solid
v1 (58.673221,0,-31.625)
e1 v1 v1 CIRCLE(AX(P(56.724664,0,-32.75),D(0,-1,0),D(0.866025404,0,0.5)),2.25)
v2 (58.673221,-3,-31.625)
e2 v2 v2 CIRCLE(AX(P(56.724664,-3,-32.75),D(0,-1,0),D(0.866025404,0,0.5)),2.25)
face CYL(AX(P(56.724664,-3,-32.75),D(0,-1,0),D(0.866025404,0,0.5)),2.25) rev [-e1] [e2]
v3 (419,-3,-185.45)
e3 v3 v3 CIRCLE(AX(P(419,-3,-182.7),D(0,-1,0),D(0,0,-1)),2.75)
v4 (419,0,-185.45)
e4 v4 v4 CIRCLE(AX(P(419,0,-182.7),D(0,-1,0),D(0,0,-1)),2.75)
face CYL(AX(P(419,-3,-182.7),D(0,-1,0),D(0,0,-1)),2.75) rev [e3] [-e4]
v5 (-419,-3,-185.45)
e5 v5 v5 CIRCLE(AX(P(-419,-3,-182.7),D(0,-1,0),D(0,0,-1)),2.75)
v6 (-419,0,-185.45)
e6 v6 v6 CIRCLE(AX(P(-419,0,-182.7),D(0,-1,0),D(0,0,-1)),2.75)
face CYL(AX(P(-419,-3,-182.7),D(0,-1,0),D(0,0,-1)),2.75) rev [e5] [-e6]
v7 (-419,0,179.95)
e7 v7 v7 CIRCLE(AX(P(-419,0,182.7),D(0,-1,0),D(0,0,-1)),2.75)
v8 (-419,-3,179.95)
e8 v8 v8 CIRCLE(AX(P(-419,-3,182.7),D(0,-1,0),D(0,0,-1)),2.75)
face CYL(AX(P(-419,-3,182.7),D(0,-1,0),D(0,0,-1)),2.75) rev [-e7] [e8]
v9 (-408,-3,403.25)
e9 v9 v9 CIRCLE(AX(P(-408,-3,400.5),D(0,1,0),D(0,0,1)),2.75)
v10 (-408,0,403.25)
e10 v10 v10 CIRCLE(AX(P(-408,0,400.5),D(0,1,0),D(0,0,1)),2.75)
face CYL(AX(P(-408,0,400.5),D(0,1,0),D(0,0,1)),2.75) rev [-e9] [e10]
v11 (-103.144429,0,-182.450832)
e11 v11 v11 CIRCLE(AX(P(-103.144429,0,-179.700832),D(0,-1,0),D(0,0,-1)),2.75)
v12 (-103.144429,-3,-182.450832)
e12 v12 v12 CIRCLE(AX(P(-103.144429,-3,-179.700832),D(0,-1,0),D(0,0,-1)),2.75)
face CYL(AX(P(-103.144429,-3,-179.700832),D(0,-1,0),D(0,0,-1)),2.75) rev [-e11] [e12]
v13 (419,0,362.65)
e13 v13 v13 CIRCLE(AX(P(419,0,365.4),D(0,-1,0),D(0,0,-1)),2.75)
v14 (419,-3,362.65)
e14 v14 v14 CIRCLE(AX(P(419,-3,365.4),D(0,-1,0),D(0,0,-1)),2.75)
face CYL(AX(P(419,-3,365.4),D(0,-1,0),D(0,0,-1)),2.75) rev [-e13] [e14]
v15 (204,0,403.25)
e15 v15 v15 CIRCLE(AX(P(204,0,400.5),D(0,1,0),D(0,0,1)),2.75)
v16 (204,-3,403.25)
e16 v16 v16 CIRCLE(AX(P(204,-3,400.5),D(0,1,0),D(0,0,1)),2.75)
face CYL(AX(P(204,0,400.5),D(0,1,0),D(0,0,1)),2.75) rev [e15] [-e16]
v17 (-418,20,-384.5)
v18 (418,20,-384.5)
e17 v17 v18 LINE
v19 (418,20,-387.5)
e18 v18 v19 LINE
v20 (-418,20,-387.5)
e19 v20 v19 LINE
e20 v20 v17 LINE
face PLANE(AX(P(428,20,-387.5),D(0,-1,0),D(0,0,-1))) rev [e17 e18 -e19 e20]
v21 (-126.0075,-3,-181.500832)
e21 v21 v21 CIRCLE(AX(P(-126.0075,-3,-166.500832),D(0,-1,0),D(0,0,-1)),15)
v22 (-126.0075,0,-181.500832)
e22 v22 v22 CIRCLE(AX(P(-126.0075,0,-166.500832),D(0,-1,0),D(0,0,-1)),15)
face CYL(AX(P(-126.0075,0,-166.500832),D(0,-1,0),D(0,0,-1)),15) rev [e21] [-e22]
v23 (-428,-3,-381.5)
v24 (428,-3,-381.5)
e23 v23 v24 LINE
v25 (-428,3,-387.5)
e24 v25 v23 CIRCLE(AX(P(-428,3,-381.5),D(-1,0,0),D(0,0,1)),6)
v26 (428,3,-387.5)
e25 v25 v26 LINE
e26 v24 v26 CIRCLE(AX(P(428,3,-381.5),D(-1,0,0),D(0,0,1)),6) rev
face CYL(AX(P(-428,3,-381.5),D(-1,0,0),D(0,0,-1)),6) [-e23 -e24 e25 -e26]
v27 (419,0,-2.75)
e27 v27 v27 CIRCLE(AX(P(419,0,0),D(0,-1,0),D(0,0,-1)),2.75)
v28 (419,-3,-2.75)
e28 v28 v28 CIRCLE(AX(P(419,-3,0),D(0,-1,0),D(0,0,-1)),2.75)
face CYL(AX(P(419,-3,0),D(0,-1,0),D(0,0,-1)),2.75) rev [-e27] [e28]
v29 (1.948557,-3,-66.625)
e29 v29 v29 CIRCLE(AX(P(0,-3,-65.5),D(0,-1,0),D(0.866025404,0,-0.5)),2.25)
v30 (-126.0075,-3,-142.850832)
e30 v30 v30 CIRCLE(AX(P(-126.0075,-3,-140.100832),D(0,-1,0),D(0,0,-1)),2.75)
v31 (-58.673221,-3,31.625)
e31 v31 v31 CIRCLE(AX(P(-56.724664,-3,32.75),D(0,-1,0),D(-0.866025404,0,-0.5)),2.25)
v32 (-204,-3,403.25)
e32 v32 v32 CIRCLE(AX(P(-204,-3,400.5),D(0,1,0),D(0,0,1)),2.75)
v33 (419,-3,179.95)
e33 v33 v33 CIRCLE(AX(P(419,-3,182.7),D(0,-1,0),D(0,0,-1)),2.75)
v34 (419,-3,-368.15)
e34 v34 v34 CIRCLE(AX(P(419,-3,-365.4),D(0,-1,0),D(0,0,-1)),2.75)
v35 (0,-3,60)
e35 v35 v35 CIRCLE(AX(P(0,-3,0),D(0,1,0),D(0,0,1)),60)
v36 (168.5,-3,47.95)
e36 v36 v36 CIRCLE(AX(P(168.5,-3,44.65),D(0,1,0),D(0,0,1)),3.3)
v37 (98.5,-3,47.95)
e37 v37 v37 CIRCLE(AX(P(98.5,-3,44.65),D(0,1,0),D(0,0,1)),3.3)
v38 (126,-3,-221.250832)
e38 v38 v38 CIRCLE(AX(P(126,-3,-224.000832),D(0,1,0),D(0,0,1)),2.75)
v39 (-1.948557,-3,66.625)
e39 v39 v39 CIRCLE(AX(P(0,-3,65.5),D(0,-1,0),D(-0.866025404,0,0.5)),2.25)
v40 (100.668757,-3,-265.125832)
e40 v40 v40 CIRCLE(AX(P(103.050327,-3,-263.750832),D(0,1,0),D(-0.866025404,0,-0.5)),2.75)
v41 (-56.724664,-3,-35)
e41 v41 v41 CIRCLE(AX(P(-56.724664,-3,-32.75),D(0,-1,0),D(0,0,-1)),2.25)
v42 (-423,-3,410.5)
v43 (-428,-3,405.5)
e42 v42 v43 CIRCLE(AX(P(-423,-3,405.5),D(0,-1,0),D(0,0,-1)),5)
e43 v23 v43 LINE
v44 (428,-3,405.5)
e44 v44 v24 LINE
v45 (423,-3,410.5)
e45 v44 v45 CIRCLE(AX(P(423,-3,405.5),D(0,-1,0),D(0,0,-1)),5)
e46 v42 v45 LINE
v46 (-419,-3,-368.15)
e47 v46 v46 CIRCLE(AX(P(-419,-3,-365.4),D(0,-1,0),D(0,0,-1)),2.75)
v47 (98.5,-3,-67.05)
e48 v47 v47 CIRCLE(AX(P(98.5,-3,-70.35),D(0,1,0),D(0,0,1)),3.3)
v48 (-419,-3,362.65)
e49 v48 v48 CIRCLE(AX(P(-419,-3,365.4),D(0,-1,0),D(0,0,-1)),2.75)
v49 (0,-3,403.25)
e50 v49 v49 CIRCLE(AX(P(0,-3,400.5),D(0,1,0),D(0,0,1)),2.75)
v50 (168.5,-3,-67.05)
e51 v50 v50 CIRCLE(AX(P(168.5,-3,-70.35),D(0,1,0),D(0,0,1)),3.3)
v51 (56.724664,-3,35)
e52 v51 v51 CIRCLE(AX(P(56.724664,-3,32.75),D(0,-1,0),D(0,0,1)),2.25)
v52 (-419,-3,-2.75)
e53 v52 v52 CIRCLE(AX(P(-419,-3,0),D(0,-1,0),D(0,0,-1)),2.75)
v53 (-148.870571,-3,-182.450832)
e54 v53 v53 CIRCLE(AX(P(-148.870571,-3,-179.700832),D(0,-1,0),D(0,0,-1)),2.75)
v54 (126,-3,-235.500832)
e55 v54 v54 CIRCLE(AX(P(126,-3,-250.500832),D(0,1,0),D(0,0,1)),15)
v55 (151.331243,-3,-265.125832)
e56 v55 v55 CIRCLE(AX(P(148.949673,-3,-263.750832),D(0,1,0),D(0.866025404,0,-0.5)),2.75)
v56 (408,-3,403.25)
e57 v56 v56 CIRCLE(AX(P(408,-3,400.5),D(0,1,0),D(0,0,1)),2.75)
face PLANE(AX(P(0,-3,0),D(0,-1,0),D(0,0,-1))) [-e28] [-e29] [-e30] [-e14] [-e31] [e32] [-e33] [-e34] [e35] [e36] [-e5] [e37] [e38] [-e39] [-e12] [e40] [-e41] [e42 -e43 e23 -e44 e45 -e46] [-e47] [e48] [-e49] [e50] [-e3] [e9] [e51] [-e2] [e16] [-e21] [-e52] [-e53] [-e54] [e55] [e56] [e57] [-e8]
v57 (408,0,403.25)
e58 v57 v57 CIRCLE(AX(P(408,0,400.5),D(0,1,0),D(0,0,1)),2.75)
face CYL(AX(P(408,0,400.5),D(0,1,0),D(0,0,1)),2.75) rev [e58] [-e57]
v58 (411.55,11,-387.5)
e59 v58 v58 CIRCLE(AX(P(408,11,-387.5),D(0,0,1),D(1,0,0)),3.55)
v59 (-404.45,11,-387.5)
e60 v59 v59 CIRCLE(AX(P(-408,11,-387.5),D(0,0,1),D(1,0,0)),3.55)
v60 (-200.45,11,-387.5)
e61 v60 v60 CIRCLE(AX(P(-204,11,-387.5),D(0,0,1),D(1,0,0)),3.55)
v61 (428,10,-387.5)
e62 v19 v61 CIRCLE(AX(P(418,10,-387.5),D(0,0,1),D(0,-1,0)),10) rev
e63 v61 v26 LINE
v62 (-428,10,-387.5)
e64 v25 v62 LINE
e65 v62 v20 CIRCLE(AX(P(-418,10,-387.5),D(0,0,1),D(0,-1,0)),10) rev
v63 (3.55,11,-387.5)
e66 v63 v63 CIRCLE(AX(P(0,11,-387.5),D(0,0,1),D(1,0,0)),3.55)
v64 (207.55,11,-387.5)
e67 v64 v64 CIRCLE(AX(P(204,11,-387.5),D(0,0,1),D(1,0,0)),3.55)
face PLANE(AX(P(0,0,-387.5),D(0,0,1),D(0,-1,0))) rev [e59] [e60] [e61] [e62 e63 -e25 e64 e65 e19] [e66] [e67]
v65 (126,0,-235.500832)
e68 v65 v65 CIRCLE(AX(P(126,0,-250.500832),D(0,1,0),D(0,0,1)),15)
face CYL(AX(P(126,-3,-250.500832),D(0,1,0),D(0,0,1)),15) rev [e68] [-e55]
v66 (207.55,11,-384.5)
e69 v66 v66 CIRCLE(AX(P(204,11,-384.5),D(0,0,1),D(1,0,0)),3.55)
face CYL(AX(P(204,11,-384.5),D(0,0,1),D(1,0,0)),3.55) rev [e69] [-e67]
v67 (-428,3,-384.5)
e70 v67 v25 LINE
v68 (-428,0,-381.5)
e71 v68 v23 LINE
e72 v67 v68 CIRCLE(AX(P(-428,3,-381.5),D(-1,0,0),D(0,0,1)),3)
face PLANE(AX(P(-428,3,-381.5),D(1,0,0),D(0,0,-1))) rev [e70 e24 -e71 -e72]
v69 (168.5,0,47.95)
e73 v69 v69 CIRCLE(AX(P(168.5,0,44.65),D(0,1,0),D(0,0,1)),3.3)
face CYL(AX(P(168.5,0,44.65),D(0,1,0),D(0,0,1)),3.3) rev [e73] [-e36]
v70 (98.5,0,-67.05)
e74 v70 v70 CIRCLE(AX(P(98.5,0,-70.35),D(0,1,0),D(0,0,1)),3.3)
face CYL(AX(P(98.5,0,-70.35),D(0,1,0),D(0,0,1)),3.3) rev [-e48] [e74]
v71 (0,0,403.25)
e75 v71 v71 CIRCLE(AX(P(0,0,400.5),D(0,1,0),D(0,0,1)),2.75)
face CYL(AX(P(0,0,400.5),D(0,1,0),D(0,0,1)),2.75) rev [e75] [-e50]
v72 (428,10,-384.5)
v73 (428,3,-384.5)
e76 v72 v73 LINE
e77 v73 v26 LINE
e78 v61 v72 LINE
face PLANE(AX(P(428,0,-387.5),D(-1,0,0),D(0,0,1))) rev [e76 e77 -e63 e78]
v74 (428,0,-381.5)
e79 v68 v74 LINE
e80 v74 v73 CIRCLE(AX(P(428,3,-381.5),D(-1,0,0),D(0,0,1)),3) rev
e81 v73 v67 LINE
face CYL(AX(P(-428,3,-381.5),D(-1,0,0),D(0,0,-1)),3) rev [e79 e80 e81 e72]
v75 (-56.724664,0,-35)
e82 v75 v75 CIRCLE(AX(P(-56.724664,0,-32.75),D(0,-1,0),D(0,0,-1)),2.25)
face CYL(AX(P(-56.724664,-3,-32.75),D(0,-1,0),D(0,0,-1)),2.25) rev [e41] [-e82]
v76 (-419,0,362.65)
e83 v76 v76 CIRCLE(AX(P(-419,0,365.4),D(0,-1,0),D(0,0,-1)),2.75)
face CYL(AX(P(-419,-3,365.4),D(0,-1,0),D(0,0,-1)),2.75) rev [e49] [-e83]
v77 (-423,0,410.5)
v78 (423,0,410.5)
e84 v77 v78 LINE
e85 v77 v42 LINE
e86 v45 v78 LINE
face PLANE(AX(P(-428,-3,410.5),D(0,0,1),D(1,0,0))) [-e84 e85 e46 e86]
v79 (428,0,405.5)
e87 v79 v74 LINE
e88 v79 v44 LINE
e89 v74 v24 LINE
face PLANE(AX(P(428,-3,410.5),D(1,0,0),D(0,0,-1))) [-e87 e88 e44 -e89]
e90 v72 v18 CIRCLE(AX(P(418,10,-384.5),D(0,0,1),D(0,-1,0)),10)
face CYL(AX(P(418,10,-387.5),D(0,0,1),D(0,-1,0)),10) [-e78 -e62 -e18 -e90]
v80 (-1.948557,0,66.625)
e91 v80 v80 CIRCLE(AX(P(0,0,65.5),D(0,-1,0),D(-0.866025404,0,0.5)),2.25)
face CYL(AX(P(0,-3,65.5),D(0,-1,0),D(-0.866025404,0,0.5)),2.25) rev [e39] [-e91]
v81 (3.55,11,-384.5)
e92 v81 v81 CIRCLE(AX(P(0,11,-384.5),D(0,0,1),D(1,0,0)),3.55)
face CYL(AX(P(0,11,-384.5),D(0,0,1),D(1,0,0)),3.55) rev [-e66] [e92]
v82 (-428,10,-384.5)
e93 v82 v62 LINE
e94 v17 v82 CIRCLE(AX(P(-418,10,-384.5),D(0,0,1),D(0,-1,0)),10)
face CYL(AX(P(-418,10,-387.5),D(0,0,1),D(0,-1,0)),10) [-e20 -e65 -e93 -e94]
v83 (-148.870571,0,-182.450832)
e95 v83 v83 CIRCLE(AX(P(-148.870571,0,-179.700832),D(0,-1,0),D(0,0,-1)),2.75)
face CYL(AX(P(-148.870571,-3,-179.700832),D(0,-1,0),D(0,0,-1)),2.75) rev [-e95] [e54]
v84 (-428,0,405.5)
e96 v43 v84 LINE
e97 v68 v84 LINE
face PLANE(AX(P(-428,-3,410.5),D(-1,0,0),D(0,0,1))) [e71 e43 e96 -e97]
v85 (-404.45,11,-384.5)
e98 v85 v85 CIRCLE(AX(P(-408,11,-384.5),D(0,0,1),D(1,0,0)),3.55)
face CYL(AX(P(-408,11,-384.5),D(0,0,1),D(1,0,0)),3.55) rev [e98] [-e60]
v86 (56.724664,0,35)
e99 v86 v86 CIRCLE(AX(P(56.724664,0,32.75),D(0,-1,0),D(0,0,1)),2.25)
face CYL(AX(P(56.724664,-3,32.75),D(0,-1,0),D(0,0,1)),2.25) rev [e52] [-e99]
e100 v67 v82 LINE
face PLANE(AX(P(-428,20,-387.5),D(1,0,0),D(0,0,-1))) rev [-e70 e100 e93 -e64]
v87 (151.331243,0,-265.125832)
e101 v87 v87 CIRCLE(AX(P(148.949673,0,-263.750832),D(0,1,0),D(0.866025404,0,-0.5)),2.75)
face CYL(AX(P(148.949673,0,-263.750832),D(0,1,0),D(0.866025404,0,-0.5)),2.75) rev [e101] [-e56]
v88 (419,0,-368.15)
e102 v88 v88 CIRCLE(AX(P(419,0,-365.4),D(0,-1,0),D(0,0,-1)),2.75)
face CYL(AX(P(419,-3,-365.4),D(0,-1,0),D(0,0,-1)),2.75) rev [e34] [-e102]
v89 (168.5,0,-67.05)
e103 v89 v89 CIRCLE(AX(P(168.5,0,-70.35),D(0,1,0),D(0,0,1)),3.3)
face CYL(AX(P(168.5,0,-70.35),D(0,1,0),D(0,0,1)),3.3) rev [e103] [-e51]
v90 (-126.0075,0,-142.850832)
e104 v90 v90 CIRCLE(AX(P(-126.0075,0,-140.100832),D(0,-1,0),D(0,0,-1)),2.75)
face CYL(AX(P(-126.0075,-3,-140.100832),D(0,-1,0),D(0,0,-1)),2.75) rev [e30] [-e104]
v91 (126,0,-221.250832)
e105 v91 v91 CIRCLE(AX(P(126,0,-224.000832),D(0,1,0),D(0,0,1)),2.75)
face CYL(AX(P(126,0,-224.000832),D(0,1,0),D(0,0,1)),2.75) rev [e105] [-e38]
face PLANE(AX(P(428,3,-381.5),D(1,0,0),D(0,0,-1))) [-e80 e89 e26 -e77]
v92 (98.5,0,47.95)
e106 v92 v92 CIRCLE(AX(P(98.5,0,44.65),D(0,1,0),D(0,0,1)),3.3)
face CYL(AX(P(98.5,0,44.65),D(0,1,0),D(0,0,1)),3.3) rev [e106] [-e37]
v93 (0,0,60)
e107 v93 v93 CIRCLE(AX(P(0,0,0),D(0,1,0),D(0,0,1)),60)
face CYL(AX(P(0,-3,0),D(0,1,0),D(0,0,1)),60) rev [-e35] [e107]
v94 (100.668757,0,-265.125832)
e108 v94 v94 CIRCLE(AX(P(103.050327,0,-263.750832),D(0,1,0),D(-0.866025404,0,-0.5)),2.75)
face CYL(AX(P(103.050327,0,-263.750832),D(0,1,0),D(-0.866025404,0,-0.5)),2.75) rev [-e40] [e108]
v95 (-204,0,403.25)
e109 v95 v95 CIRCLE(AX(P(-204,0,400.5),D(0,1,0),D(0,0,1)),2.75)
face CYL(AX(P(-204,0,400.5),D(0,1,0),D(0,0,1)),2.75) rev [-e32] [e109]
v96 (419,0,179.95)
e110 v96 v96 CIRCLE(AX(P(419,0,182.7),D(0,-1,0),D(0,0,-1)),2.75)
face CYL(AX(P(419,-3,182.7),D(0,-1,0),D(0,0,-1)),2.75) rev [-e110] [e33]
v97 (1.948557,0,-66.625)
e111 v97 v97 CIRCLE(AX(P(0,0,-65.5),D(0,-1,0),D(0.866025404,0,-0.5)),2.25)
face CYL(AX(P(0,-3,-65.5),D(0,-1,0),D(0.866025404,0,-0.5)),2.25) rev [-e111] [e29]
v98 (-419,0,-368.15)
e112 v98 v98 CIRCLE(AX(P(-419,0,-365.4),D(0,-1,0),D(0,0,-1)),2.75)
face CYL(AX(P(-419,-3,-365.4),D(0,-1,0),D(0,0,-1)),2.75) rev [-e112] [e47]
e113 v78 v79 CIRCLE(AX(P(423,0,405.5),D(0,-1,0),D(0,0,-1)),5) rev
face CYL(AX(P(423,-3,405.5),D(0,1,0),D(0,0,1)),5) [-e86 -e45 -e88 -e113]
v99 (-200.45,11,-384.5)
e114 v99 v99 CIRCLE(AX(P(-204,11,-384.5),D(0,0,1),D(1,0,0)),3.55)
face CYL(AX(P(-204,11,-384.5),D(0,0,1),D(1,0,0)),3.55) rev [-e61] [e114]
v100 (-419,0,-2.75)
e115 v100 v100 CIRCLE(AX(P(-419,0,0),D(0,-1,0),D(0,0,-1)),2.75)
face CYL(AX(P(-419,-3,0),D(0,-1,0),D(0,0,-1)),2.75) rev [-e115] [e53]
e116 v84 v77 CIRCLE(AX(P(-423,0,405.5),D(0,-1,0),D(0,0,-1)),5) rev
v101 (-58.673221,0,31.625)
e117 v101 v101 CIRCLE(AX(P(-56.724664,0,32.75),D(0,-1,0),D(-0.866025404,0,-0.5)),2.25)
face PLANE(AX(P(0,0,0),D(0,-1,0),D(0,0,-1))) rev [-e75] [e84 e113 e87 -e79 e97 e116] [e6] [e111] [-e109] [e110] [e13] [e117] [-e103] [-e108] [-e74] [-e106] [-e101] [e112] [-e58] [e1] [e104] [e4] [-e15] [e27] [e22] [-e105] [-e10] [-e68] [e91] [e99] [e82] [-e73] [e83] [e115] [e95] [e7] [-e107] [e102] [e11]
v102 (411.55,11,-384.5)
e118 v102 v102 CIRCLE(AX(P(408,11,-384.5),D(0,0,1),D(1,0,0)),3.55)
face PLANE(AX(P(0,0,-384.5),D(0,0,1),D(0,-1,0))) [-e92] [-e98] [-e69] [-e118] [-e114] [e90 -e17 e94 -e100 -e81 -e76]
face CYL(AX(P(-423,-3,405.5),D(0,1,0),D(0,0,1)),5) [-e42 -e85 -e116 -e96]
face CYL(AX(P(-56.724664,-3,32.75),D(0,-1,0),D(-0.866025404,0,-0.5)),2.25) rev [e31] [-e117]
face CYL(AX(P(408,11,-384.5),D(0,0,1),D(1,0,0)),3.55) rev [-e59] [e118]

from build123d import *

# Parameters (mm, degrees)
SKETCH1_W                    = 856
SKETCH1_H                    = 798
BASE_FLANGE1_DEPTH           = 3
SKETCH8_R                    = 60
CUT_EXTRUDE1_DEPTH           = 3
M4_CLEARANCE_HOLE1_D         = 4.5
CIRPATTERN1_COUNT            = 6
EDGE_FLANGE1_STRIP_W         = 18
EDGE_FLANGE1_STRIP_H         = 3
EDGE_FLANGE1_STRIP_CUT_DEPTH = 856
EDGE_FLANGE1_DEPTH           = 856
M5_CLEARANCE_HOLE3_D         = 5.5
M5_CLEARANCE_HOLE4_D         = 5.5
LPATTERN1_COUNT              = 5
LPATTERN1_PITCH              = 204
F_7_1_7_1_DIAMETER_HOLE1_D   = 7.1
LPATTERN2_COUNT              = 5
LPATTERN2_PITCH              = 204
SKETCH26_R                   = 15
CUT_EXTRUDE2_DEPTH           = 3
M5_CLEARANCE_HOLE6_D         = 5.5
FILLET1_R                    = 5
FILLET2_R                    = 10
SKETCH29_R                   = 15
CUT_EXTRUDE3_DEPTH           = 10
M5_CLEARANCE_HOLE7_D         = 5.5
CIRPATTERN2_COUNT            = 3
M6_CLEARANCE_HOLE1_D         = 6.6


# Sheet-metal steps are written as plain solids
with BuildPart() as part:
    # Sketch1 → Base-Flange1 (new body)
    with BuildSketch(Plane(origin=(0, 0, 0), x_dir=(1, 0, 0), z_dir=(0, 1, 0))):
        with Locations((0, -11.5)):
            Rectangle(SKETCH1_W, SKETCH1_H)
    extrude(amount=-BASE_FLANGE1_DEPTH)

    # Sketch8 → Cut-Extrude1 (cut)
    with BuildSketch(Plane(origin=(0, 0, 0), x_dir=(1, 0, 0), z_dir=(0, 1, 0))):
        with Locations(Location((0, 0, 0), (0, 0, 270))):
            Circle(SKETCH8_R)
    extrude(amount=-CUT_EXTRUDE1_DEPTH, mode=Mode.SUBTRACT)

    # M4 Clearance Hole1 (through all)
    with Locations(Plane(origin=(0, -3, 0), x_dir=(-1, 0, 0), z_dir=(0, -1, 0))):
        with Locations((56.724663948, 32.75)):
            m4_clearance_hole1 = Hole(M4_CLEARANCE_HOLE1_D / 2)

    # CirPattern1: M4 Clearance Hole1 ×6 about axis
    cirpattern1_axis = Axis((0, 0, 0), (0, 1, 0))
    for i in range(1, CIRPATTERN1_COUNT):
        add(m4_clearance_hole1.rotate(cirpattern1_axis, i * 360 / CIRPATTERN1_COUNT), mode=Mode.SUBTRACT)

    # Edge-Flange1 strip (across the edge) → Edge-Flange1 strip cut (cut)
    with BuildSketch(Plane(origin=(428, 0, -387.5), x_dir=(0, 0, 1), z_dir=(-1, 0, 0))):
        with Locations((-3, -1.5)):
            Rectangle(EDGE_FLANGE1_STRIP_W, EDGE_FLANGE1_STRIP_H)
    extrude(amount=EDGE_FLANGE1_STRIP_CUT_DEPTH, mode=Mode.SUBTRACT)

    # Edge-Flange1 section (across the edge) → Edge-Flange1 (add)
    with BuildSketch(Plane(origin=(428, 0, -387.5), x_dir=(0, 0, 1), z_dir=(-1, 0, 0))):
        with BuildLine():
            Line((0, 3), (0, 20))
            Line((0, 20), (3, 20))
            Line((3, 20), (3, 3))
            ThreePointArc((3, 3), (3.878679656, 0.878679656), (6, 0))
            Line((6, 0), (6, -3))
            ThreePointArc((6, -3), (1.757359313, -1.242640687), (0, 3))
        make_face()
    extrude(amount=EDGE_FLANGE1_DEPTH)

    # M5 Clearance Hole3 (through all)
    with Locations(Plane(origin=(0, -3, 0), x_dir=(-1, 0, 0), z_dir=(0, -1, 0))):
        with Locations((419, 365.4), (419, 182.7), (419, 0), (419, -182.7), (419, -365.4)):
            m5_clearance_hole3 = Hole(M5_CLEARANCE_HOLE3_D / 2)

    # Mirror2: M5 Clearance Hole3 across plane
    add(m5_clearance_hole3.mirror(Plane(origin=(0, 0, 0), x_dir=(0, 0, 1), z_dir=(1, 0, 0))), mode=Mode.SUBTRACT)

    # M5 Clearance Hole4 (through all)
    with Locations(Plane(origin=(0, 0, 0), x_dir=(1, 0, 0), z_dir=(0, 1, 0))):
        with Locations((-408, -400.5)):
            m5_clearance_hole4 = Hole(M5_CLEARANCE_HOLE4_D / 2)

    # LPattern1: M5 Clearance Hole4 ×5
    with Locations(*[(i * LPATTERN1_PITCH, 0, 0) for i in range(1, LPATTERN1_COUNT)]):
        add(m5_clearance_hole4, mode=Mode.SUBTRACT)

    # Ø7.1 (7.1) Diameter Hole1 (through all)
    with Locations(Plane.XY.offset(-384.5)):
        with Locations((-408, 11)):
            f_7_1_7_1_diameter_hole1 = Hole(F_7_1_7_1_DIAMETER_HOLE1_D / 2)

    # LPattern2: Ø7.1 (7.1) Diameter Hole1 ×5
    with Locations(*[(i * LPATTERN2_PITCH, 0, 0) for i in range(1, LPATTERN2_COUNT)]):
        add(f_7_1_7_1_diameter_hole1, mode=Mode.SUBTRACT)

    # Sketch26 → Cut-Extrude2 (cut)
    with BuildSketch(Plane(origin=(0, -3, 0), x_dir=(-1, 0, 0), z_dir=(0, -1, 0))):
        with Locations(Location((126.0075, 166.500832071, 0), (0, 0, 90))):
            Circle(SKETCH26_R)
    extrude(amount=-CUT_EXTRUDE2_DEPTH, mode=Mode.SUBTRACT)

    # M5 Clearance Hole6 (through all)
    with Locations(Plane(origin=(0, -3, 0), x_dir=(-1, 0, 0), z_dir=(0, -1, 0))):
        with Locations((148.87057066, 179.700832071), (126.0075, 140.100832071), (103.14442934, 179.700832071)):
            Hole(M5_CLEARANCE_HOLE6_D / 2)

    # Fillet1
    fillet1_edges = [part.edges().sort_by_distance(p)[0] for p in [
        (428, -1.5, 410.5),
        (-428, -1.5, 410.5),
    ]]
    fillet(fillet1_edges, radius=FILLET1_R)

    # Fillet2
    fillet2_edges = [part.edges().sort_by_distance(p)[0] for p in [
        (428, 20, -386),
        (-428, 20, -386),
    ]]
    fillet(fillet2_edges, radius=FILLET2_R)

    # Sketch29 → Cut-Extrude3 (cut)
    with BuildSketch(Plane(origin=(0, 0, 0), x_dir=(1, 0, 0), z_dir=(0, 1, 0))):
        with Locations(Location((126, 250.500832071, 0), (0, 0, 270))):
            Circle(SKETCH29_R)
    extrude(amount=-CUT_EXTRUDE3_DEPTH, mode=Mode.SUBTRACT)

    # M5 Clearance Hole7 (through all)
    with Locations(Plane(origin=(0, 0, 0), x_dir=(1, 0, 0), z_dir=(0, 1, 0))):
        with Locations((126, 224.000832071)):
            m5_clearance_hole7 = Hole(M5_CLEARANCE_HOLE7_D / 2)

    # CirPattern2: M5 Clearance Hole7 ×3 about axis
    cirpattern2_axis = Axis((126, 0, -250.500832071), (0, 1, 0))
    for i in range(1, CIRPATTERN2_COUNT):
        add(m5_clearance_hole7.rotate(cirpattern2_axis, i * 360 / CIRPATTERN2_COUNT), mode=Mode.SUBTRACT)

    # M6 Clearance Hole1 (through all)
    with Locations(Plane(origin=(0, 0, 0), x_dir=(1, 0, 0), z_dir=(0, 1, 0))):
        with Locations((98.5, -44.65), (168.5, -44.65), (168.5, 70.35), (98.5, 70.35)):
            Hole(M6_CLEARANCE_HOLE1_D / 2)


solid = part.part
